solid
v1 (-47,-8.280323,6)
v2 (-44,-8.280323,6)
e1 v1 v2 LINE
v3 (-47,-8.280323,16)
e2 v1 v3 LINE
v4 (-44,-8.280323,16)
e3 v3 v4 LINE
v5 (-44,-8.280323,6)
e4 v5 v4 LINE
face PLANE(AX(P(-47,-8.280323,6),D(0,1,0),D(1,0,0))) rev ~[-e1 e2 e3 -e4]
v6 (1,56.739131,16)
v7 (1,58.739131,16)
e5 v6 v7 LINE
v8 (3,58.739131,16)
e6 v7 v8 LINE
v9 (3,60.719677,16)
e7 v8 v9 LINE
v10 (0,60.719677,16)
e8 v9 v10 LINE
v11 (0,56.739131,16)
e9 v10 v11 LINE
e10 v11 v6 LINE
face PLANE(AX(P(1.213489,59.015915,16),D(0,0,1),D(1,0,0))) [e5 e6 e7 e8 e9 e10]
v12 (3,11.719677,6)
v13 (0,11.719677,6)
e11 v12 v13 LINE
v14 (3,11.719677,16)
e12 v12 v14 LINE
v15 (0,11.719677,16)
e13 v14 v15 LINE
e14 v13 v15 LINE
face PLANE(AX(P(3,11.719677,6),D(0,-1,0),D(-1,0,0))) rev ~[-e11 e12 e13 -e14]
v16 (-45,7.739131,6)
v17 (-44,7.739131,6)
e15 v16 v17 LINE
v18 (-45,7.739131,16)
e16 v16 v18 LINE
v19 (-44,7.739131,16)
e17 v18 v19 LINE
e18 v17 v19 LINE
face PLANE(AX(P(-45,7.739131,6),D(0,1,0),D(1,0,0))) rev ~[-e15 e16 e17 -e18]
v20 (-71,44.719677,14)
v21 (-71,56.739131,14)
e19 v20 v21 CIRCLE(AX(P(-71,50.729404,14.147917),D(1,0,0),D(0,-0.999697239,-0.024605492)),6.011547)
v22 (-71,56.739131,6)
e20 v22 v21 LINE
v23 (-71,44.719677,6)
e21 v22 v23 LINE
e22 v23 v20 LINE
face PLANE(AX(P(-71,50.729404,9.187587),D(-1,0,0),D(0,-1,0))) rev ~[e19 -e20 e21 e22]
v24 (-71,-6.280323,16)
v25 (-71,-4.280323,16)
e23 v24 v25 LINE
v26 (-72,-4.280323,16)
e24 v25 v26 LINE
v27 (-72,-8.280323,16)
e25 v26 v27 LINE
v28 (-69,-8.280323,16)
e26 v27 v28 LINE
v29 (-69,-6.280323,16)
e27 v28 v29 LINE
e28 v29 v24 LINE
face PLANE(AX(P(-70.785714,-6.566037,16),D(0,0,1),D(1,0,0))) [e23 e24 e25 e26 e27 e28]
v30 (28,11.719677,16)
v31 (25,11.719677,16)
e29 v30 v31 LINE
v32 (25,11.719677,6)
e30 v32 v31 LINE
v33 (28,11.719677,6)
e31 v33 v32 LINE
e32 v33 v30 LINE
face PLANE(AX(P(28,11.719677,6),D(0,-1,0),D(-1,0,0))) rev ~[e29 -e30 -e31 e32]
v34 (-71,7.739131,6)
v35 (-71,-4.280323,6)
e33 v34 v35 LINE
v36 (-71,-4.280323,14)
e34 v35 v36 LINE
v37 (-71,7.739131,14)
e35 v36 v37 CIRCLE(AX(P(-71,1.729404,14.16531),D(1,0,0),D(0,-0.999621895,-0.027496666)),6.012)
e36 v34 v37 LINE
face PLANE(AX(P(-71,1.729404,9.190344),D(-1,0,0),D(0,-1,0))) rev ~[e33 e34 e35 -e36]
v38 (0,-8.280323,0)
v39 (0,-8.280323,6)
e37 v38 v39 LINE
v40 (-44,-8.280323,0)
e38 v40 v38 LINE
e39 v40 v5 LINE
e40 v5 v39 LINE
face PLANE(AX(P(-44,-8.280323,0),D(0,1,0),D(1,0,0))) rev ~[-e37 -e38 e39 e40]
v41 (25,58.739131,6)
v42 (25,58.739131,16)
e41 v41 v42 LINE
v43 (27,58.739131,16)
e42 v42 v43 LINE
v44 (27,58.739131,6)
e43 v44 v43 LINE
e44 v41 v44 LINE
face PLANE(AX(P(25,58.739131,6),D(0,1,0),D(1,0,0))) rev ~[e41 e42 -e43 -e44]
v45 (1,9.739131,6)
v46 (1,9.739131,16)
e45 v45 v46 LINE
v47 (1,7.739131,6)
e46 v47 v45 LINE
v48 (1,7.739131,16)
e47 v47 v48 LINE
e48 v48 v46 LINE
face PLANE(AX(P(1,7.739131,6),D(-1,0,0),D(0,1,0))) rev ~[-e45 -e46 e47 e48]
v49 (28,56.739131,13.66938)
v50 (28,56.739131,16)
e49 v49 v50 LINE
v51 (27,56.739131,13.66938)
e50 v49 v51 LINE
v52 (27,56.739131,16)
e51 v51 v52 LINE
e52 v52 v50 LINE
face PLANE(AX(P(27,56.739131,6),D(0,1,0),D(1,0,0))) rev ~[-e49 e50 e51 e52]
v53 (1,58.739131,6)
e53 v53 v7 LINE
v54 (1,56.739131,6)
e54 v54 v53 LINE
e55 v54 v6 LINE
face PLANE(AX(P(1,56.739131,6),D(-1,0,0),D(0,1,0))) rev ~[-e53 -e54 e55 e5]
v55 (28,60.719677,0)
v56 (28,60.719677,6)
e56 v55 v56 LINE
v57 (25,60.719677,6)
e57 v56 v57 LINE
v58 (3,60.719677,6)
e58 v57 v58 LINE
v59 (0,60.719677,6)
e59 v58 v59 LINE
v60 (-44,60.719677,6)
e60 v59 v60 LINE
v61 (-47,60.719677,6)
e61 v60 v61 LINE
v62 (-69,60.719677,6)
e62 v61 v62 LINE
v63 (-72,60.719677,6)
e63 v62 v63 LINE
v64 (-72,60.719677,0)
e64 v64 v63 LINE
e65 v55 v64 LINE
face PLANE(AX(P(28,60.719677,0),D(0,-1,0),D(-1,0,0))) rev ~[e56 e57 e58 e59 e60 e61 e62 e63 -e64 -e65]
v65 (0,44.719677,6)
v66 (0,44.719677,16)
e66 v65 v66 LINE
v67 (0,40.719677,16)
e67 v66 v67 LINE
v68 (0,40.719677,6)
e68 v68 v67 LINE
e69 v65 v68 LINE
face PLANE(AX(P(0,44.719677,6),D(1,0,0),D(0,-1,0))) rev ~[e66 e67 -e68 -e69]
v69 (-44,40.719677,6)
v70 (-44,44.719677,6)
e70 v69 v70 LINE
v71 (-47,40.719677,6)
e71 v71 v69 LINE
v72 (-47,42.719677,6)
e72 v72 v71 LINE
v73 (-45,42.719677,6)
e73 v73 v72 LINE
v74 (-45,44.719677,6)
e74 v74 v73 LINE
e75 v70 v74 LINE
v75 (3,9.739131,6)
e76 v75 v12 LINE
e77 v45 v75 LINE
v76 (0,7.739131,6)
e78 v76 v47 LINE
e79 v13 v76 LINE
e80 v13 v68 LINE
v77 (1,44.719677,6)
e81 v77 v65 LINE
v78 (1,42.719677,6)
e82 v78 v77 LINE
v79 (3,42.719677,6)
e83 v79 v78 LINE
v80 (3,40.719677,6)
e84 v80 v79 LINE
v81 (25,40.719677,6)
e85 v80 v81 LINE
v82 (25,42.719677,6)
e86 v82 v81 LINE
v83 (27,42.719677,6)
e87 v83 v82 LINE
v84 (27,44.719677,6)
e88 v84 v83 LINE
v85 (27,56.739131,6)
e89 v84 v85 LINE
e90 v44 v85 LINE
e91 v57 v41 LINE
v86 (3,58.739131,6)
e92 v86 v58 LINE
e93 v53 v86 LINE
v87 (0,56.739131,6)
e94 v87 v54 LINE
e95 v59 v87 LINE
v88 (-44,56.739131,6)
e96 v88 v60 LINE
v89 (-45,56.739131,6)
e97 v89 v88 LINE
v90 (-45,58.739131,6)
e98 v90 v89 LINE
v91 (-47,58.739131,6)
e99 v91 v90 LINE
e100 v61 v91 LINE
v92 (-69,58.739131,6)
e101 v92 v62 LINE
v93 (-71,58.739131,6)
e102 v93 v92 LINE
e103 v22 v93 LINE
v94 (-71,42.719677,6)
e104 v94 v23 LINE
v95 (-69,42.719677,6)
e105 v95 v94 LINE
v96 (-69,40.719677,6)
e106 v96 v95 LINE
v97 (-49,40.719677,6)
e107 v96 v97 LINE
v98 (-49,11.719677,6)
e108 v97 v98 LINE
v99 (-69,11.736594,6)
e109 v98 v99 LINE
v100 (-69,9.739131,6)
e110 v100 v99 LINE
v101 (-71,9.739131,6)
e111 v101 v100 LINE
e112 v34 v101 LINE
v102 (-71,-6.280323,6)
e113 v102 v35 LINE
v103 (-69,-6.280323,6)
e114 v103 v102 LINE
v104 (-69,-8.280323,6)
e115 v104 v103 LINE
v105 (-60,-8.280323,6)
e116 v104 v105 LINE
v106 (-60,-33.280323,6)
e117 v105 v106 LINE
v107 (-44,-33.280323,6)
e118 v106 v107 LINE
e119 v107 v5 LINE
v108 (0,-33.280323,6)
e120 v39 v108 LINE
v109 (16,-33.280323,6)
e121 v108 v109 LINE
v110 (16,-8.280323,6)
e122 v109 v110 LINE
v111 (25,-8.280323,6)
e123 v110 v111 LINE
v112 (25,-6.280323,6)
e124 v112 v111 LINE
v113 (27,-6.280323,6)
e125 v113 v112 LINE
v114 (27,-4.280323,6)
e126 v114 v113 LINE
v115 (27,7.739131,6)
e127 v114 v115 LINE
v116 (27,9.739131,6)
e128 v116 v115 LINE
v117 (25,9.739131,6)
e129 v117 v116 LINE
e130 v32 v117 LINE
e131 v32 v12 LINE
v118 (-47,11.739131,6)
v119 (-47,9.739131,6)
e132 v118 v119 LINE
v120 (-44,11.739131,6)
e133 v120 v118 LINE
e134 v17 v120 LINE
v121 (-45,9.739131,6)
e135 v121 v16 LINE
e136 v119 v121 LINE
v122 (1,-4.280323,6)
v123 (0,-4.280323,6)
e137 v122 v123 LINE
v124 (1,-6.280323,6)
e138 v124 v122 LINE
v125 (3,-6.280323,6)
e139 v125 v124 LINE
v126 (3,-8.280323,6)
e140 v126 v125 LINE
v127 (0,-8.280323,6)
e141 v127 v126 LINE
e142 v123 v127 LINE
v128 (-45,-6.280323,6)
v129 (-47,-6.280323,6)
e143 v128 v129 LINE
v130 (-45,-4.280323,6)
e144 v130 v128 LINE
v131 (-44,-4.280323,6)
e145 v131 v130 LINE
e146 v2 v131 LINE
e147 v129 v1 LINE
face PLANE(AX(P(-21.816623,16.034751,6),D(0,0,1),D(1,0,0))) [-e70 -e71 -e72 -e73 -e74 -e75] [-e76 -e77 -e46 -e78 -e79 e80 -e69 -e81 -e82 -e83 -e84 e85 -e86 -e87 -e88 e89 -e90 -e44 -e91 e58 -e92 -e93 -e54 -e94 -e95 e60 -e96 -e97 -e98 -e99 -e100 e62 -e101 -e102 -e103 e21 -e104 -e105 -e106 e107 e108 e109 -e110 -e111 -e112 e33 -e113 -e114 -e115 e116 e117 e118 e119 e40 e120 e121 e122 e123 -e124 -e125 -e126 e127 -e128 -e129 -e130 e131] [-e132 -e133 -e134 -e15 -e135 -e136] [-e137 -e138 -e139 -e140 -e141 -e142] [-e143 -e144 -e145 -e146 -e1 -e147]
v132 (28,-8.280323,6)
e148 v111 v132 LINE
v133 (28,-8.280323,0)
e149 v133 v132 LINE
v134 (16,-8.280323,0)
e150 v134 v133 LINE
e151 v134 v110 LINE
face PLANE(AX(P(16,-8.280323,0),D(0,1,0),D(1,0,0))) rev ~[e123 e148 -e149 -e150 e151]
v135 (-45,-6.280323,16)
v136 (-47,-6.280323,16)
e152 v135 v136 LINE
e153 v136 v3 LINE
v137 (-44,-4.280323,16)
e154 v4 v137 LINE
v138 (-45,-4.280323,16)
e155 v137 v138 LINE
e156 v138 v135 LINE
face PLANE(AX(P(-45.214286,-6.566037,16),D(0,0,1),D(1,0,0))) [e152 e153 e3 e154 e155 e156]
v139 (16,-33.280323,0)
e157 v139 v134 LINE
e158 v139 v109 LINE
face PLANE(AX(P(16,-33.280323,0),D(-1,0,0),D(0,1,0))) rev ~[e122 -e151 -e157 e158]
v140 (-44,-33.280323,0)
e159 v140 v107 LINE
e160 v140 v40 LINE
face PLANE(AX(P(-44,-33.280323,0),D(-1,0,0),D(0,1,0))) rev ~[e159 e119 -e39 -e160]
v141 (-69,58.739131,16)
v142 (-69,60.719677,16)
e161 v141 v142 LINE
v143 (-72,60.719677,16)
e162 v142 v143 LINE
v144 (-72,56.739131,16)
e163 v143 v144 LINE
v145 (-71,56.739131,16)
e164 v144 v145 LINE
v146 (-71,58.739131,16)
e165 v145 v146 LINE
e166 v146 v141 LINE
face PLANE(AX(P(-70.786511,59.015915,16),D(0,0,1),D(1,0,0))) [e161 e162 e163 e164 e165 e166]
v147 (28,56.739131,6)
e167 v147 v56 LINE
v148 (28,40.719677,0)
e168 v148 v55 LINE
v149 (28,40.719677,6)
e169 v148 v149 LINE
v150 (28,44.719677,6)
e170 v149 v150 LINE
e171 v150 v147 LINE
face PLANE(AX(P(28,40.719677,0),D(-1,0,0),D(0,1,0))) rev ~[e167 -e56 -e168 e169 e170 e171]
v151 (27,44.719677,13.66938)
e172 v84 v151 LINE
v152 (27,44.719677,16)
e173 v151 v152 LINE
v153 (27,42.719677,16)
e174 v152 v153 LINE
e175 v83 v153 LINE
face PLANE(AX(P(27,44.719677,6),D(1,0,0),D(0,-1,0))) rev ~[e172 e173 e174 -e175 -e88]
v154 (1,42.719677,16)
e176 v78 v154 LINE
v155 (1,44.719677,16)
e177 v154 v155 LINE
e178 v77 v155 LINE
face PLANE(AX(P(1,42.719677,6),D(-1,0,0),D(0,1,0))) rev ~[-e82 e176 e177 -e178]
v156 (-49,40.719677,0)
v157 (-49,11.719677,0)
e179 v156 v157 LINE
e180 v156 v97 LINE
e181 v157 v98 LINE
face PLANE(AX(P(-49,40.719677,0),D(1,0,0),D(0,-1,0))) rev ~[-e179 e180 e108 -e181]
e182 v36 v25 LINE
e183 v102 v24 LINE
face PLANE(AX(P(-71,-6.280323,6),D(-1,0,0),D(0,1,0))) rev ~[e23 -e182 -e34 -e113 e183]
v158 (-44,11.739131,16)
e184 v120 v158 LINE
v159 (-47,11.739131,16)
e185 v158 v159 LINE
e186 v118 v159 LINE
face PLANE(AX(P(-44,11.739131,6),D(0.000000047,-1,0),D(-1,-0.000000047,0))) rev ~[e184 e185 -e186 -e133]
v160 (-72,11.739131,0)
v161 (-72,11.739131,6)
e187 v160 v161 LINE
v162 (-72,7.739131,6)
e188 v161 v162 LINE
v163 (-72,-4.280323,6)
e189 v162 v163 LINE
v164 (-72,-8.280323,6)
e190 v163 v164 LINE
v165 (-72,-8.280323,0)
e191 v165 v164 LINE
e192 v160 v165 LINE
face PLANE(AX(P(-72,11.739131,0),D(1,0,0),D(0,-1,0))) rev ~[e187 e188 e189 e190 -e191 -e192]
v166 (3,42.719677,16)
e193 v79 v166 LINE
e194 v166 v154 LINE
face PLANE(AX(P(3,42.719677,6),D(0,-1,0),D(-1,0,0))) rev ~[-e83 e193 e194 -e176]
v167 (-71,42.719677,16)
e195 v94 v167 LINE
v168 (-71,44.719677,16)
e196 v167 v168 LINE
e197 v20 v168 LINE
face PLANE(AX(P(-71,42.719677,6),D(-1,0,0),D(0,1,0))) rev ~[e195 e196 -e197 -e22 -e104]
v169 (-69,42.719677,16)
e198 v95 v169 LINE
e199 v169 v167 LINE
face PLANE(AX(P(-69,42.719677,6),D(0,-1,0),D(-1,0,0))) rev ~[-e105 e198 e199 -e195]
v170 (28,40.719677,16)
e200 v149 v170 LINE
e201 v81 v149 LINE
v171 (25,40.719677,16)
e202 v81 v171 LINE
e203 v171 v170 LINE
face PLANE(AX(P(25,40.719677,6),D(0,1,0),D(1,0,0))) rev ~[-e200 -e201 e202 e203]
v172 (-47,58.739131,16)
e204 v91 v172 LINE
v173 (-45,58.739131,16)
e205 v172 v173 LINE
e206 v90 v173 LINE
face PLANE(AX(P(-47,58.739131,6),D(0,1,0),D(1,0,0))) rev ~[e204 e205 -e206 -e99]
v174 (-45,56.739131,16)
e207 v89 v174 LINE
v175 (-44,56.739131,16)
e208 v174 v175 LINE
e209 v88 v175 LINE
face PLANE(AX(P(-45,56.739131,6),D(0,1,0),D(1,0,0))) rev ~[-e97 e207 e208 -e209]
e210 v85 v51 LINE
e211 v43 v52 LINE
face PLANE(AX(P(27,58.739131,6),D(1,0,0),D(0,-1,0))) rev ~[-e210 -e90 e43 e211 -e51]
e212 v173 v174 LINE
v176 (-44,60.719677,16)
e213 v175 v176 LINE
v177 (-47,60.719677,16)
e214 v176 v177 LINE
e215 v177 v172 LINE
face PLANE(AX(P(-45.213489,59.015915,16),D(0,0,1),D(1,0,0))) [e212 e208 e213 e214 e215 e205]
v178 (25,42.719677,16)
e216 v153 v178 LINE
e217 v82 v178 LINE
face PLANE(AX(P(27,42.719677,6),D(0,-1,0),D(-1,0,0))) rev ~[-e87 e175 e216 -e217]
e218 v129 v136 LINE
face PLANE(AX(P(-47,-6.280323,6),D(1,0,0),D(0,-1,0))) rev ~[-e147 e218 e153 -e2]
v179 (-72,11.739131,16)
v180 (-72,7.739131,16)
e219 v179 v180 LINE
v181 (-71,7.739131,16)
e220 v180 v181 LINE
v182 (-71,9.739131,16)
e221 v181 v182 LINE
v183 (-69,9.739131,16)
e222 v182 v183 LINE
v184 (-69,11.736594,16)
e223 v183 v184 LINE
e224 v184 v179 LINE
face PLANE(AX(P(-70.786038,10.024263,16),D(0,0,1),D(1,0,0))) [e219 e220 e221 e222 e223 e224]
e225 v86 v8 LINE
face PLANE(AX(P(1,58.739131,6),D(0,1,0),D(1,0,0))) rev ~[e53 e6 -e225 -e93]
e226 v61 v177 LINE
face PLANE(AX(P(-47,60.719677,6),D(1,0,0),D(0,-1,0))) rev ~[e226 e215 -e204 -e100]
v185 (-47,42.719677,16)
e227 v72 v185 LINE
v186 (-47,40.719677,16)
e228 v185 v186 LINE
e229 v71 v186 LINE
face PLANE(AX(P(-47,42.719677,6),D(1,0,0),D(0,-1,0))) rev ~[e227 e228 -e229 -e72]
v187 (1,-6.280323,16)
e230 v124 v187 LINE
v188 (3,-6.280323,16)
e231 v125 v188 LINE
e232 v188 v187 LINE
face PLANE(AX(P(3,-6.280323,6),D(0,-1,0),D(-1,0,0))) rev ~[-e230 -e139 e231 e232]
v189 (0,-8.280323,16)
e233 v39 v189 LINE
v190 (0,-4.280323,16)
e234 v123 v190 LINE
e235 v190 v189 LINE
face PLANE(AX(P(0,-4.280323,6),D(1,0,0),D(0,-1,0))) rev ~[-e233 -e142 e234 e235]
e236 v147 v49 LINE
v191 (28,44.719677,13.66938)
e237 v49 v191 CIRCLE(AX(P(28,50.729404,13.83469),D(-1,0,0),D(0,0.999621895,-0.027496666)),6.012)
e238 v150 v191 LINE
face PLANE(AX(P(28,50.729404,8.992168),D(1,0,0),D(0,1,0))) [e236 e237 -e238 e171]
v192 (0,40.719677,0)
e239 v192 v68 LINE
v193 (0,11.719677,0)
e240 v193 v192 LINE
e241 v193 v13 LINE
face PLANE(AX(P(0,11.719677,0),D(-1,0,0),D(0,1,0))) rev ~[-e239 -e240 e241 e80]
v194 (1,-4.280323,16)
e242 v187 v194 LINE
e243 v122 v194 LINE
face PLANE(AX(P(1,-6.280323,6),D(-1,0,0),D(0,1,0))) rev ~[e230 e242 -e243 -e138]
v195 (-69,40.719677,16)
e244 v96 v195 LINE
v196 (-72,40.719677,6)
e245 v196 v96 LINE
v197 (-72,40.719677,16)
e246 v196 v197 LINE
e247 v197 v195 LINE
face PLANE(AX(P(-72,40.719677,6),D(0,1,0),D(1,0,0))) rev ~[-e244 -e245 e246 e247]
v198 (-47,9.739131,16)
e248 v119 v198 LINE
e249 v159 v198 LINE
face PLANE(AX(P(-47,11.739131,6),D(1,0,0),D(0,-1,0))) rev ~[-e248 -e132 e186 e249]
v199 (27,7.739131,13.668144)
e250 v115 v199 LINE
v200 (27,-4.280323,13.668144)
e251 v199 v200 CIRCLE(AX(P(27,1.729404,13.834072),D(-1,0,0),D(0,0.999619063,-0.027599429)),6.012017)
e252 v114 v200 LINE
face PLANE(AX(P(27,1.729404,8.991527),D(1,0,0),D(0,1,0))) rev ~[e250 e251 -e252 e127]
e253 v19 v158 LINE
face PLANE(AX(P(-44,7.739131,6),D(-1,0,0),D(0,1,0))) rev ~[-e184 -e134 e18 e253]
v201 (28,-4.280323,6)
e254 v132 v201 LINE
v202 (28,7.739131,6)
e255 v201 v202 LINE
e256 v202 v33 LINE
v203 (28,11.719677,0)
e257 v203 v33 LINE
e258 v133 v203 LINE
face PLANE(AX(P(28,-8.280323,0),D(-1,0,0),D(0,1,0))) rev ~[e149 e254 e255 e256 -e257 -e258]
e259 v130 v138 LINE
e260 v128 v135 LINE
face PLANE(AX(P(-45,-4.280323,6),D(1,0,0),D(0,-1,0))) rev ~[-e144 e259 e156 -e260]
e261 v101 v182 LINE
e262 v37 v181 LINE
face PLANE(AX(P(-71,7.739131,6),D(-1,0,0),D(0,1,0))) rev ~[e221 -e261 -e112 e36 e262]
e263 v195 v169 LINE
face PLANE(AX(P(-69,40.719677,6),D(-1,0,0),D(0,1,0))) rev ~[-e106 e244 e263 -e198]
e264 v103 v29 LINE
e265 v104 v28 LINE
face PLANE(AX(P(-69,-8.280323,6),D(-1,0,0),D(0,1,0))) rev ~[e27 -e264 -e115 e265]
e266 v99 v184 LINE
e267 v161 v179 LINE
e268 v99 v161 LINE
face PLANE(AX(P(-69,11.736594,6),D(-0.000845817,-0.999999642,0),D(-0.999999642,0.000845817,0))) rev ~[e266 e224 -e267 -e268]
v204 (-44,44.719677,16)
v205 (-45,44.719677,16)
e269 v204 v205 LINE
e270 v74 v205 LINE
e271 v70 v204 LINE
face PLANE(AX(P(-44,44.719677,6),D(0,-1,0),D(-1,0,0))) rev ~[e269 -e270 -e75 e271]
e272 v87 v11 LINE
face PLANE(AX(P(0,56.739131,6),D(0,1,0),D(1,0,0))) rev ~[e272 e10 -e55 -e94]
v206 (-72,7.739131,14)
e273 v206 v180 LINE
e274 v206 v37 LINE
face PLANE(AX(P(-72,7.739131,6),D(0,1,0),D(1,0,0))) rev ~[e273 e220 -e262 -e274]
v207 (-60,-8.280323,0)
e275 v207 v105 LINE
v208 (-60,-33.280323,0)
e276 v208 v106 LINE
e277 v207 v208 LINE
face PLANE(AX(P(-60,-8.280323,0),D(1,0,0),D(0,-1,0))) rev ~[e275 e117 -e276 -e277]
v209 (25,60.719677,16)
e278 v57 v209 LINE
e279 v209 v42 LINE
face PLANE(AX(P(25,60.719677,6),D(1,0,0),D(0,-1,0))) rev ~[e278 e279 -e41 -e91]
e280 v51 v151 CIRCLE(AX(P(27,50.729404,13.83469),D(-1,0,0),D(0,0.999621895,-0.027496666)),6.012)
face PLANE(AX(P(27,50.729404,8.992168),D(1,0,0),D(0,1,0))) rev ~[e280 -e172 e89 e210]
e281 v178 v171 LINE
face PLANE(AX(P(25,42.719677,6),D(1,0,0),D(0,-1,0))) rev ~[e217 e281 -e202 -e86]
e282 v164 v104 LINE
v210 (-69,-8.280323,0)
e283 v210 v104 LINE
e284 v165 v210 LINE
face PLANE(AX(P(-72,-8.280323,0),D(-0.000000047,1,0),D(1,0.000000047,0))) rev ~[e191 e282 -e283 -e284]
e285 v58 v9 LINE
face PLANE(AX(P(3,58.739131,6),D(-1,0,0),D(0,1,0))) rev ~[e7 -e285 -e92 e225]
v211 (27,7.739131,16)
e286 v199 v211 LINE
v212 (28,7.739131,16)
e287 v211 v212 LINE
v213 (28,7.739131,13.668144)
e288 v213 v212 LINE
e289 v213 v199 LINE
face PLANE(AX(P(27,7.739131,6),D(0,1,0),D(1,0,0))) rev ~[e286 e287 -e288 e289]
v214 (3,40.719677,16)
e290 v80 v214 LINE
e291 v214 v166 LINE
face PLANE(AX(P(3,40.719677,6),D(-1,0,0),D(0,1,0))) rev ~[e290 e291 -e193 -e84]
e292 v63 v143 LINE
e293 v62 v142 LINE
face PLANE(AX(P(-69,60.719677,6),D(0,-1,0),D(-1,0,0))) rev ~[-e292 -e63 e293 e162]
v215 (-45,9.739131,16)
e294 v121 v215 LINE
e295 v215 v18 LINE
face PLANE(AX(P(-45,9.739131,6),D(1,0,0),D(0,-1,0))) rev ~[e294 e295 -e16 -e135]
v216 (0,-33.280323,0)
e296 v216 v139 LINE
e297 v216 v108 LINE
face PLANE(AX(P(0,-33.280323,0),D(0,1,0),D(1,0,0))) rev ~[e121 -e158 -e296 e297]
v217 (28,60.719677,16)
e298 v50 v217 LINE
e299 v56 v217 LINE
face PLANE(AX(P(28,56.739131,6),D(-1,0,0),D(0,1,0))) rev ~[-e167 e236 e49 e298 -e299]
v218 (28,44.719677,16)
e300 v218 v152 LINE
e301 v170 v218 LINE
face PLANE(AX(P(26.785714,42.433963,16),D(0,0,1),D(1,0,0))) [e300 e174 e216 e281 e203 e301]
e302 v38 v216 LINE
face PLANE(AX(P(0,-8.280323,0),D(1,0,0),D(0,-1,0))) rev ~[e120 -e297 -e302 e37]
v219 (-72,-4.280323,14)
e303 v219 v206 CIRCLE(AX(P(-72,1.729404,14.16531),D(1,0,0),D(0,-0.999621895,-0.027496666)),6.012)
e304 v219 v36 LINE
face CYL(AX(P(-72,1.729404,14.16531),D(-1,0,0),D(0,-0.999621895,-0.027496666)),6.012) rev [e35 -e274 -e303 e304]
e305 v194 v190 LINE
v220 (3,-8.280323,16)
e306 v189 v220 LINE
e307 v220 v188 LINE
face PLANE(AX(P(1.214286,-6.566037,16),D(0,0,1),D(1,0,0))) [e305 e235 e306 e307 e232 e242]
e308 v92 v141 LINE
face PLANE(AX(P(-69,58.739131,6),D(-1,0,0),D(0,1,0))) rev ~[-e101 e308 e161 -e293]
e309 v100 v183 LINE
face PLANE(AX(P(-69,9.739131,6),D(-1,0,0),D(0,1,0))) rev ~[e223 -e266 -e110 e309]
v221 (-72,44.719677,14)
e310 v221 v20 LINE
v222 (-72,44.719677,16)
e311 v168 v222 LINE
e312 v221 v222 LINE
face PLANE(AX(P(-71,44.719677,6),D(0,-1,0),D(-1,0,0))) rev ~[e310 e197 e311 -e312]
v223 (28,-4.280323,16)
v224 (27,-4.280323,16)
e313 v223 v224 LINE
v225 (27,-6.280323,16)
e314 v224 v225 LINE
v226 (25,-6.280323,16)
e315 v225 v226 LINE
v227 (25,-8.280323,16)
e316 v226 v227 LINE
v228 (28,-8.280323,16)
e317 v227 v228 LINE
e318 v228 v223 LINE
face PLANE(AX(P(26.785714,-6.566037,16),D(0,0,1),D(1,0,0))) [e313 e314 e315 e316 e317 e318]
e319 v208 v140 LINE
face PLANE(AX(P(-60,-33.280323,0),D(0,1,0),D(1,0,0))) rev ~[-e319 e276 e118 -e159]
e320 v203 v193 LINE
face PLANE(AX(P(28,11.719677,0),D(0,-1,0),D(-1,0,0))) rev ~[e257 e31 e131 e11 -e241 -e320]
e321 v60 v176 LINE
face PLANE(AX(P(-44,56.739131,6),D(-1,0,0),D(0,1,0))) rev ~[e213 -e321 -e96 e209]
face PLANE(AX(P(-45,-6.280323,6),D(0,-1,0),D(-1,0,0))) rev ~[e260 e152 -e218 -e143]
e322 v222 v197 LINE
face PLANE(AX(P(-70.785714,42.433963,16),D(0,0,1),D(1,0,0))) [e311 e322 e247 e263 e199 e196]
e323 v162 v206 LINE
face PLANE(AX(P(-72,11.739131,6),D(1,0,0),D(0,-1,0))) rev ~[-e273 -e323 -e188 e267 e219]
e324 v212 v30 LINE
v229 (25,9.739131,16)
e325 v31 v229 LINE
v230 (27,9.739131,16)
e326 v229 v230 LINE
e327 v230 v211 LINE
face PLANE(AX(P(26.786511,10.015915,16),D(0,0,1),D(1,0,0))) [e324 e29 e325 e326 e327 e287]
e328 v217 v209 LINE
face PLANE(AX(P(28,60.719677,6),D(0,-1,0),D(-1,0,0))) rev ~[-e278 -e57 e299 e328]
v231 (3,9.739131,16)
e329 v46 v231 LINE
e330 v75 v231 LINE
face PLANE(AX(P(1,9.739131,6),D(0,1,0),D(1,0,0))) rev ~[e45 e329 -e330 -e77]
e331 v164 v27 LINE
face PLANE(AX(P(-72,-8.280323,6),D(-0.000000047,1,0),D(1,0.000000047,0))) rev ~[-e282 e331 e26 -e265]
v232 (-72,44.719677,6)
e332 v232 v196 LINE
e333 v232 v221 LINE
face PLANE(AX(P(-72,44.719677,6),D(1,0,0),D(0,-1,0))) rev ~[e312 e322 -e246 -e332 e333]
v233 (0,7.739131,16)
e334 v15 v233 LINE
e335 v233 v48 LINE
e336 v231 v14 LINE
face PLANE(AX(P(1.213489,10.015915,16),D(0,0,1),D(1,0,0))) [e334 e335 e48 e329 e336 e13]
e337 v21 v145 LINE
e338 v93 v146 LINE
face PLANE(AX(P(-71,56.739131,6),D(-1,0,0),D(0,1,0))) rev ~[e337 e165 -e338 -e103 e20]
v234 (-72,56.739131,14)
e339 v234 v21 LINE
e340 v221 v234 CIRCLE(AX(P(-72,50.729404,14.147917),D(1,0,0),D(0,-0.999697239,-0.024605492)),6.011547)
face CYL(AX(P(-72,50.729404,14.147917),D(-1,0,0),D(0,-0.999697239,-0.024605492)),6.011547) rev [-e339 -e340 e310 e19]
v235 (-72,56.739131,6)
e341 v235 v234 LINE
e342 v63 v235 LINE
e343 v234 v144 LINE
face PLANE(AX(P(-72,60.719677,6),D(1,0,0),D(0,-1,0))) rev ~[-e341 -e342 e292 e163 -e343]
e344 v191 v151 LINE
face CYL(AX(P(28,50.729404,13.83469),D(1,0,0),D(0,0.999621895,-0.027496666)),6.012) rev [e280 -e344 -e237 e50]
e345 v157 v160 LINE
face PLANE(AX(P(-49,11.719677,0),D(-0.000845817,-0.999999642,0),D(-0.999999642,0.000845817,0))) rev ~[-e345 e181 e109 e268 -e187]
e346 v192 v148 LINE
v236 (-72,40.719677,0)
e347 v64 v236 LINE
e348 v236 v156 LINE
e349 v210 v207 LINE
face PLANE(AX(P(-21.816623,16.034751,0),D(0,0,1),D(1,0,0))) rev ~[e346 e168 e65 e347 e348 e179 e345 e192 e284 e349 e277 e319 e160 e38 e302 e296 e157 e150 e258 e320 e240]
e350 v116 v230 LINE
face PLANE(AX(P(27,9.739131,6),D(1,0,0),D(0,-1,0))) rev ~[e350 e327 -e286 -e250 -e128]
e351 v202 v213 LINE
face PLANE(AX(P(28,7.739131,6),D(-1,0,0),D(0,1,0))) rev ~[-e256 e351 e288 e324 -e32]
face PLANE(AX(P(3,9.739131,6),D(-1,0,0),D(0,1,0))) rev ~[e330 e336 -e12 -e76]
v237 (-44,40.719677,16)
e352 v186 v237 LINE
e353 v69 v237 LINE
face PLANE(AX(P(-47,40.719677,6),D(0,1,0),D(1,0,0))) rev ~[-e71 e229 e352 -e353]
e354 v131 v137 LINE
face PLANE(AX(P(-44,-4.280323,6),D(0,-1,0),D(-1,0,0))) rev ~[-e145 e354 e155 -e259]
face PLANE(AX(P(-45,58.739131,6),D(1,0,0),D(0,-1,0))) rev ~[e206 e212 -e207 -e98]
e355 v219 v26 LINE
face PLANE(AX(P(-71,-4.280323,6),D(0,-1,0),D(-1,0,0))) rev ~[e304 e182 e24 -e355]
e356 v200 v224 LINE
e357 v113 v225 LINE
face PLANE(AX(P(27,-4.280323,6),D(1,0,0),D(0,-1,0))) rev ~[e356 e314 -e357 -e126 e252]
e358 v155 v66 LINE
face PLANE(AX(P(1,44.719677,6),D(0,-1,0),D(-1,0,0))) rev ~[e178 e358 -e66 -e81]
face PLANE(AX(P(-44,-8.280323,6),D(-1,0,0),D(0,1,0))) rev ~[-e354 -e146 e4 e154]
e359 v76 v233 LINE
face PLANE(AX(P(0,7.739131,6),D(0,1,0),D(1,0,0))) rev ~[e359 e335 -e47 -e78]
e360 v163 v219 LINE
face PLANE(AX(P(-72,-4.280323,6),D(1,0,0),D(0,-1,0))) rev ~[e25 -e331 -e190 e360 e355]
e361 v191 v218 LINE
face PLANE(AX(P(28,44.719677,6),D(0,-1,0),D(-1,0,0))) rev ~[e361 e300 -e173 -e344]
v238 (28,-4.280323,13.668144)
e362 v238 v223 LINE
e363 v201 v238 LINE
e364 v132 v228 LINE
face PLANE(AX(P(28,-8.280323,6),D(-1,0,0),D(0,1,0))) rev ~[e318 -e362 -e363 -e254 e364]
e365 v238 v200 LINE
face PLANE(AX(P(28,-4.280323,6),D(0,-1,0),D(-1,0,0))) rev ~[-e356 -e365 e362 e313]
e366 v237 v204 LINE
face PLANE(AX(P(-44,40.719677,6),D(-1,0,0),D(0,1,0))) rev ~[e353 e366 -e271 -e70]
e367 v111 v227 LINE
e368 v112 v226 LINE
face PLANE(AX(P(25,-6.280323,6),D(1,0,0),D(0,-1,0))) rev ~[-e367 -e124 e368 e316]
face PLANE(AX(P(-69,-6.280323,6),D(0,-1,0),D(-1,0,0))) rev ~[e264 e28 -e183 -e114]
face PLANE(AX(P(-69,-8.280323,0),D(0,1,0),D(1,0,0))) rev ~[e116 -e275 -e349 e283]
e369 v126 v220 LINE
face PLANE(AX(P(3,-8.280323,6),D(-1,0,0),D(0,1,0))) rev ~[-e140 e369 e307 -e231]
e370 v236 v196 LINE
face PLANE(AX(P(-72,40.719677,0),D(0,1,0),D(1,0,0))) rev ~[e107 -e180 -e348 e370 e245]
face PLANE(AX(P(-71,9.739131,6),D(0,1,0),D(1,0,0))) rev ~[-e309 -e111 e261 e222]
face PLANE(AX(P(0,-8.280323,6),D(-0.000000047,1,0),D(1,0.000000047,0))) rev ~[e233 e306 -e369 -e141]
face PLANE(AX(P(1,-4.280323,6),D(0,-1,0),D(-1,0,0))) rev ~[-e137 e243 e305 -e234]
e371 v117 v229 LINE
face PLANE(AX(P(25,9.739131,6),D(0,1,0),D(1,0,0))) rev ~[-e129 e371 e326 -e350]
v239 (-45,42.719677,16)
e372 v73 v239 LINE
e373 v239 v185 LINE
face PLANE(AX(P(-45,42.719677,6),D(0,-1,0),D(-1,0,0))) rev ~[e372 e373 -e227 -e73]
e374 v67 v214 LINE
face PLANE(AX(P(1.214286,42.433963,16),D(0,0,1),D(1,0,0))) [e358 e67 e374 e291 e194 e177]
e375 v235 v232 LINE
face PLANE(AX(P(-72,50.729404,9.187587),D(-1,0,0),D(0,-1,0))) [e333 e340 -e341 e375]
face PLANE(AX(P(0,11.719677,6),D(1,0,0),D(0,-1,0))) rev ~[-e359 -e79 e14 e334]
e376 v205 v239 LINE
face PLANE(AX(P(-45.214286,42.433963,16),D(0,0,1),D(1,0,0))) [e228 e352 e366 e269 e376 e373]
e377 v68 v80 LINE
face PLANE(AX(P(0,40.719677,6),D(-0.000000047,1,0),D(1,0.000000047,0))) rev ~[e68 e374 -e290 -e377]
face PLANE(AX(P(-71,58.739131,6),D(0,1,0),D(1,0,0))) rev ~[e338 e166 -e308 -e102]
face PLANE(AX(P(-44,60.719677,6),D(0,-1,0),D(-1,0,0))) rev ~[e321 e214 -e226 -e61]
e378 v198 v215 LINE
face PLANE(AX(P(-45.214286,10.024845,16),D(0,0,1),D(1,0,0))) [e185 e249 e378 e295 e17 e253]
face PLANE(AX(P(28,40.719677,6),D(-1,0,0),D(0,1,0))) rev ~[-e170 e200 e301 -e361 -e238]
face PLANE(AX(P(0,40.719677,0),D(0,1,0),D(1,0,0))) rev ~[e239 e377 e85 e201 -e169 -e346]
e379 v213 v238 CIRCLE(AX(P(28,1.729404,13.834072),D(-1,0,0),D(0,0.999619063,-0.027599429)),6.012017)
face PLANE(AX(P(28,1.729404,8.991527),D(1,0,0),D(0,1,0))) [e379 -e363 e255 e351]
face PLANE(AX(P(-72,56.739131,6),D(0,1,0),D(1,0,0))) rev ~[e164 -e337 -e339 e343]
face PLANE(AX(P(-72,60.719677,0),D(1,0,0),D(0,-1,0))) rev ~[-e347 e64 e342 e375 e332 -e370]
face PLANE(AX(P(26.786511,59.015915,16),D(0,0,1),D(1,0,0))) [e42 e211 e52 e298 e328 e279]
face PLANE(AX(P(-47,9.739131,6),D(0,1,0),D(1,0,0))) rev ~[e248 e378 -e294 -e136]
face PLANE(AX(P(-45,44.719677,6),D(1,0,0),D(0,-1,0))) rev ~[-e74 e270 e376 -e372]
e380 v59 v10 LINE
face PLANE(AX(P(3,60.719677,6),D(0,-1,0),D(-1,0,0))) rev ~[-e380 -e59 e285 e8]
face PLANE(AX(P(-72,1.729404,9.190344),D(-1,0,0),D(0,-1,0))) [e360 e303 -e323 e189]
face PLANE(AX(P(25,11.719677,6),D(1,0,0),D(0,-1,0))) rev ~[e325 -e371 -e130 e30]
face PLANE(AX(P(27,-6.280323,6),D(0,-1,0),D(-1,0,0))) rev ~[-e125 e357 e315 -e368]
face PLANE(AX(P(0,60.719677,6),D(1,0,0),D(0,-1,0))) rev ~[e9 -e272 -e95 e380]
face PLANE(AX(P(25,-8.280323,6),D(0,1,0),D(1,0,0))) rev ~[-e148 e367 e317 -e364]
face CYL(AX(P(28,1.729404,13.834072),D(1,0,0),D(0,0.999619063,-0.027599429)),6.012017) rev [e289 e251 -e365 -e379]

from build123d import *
from build123d import SkipClean  # not in build123d's __all__

# Parameters (mm, degrees)
F1_DEPTH  = 6
F3_DEPTH  = 10
F5_DEPTH  = 1
F7_DEPTH  = 1
F9_DEPTH  = 1
F10_DEPTH = 1
F13_DEPTH = 1


# Not quite as in the source:
# - ends of sketch curves that miss each other by under 0.0002 mm in the source are joined


with BuildPart() as f1:
    # F0 (on Top) → F1 (new body)
    with BuildSketch(Plane.XY):
        Polygon((-60, -8.2803227458), (-60, -33.2803227458), (-44, -33.2803227458), (-44, -8.2803227458), (0, -8.2803227458), (0, -33.2803227458), (16, -33.2803227458), (16, -8.2803227458), (28, -8.2803227458), (28, 11.7196772542), (0, 11.7196772542), (0, 40.7196772542), (28, 40.7196772542), (28, 60.7196772542), (-72, 60.7196772542), (-72, 40.7196772542), (-49, 40.7196772542), (-49, 11.7196772542), (-72, 11.7391310632), (-72, 11.693589665), (-72, 7.693589665), (-72, -4.280322887), (-72, -8.280322887), (-69, -8.2803227458), align=None)
    extrude(amount=F1_DEPTH)

    # F2 (on face) → F3 (join)
    with BuildSketch(Plane.XY.offset(6)):
        Polygon((-72, 60.7196772542), (-72, 56.7391310632), (-71, 56.7391310632), (-71, 58.7391310632), (-69, 58.7391310632), (-69, 60.7196772542), align=None)
        Polygon((-72, 40.7196773953), (-69, 40.7196773953), (-69, 42.7196773953), (-71, 42.7196773953), (-71, 44.7196773953), (-72, 44.7196773953), align=None)
        Polygon((-45, 42.7196773953), (-47, 42.7196773953), (-47, 40.7196773953), (-44, 40.7196773953), (-44, 44.7196773953), (-45, 44.7196773953), align=None)
        Polygon((-44, 60.7196772542), (-47, 60.7196772542), (-47, 58.7391310632), (-45, 58.7391310632), (-45, 56.7391310632), (-44, 56.7391310632), align=None)
        Polygon((28, 60.7196772542), (25, 60.7196772542), (25, 58.7391310632), (27, 58.7391310632), (27, 56.7391310632), (28, 56.7391310632), align=None)
        Polygon((25, 42.7196773953), (25, 40.7196773953), (28, 40.7196773953), (28, 44.7196773953), (27, 44.7196773953), (27, 42.7196773953), align=None)
        Polygon((0, 44.7196773953), (0, 40.7196772542), (3, 40.7196773953), (3, 42.7196773953), (1, 42.7196773953), (1, 44.7196773953), align=None)
        Polygon((3, 60.7196772542), (0, 60.7196772542), (0, 56.7391310632), (1, 56.7391310632), (1, 58.7391310632), (3, 58.7391310632), align=None)
        Polygon((27, 7.7391309221), (28, 7.7391309221), (28, 11.7196772542), (25, 11.7196772542), (25, 9.7391309221), (27, 9.7391309221), align=None)
        Polygon((25, -6.2803227458), (25, -8.2803227458), (28, -8.2803227458), (28, -4.2803227458), (27, -4.2803227458), (27, -6.2803227458), align=None)
        Polygon((0, -4.2803227458), (0, -8.280322887), (3, -8.2803227458), (3, -6.2803227458), (1, -6.2803227458), (1, -4.2803227458), align=None)
        Polygon((3, 9.7391309221), (3, 11.7196772542), (0, 11.7196772542), (0, 7.7391309221), (1, 7.7391309221), (1, 9.7391309221), align=None)
        Polygon((-45, 7.7391309221), (-44, 7.7391309221), (-44, 11.7391310632), (-47, 11.7391309221), (-47, 9.7391309221), (-45, 9.7391309221), align=None)
        Polygon((-47, -8.2803227458), (-44, -8.2803227458), (-44, -4.2803227458), (-45, -4.2803227458), (-45, -6.2803227458), (-47, -6.2803227458), align=None)
        Polygon((-72, -4.2803227458), (-72, -8.280322887), (-69, -8.2803227458), (-69, -6.2803227458), (-71, -6.2803227458), (-71, -4.2803227458), align=None)
        Polygon((-72, 11.7391310632), (-72, 7.7391309221), (-71, 7.7391309221), (-71, 9.7391309221), (-69, 9.7391309221), (-69, 11.7365936099), align=None)
    with SkipClean():  # cleaning this boolean's faces spoils the solid; the shape is the same uncleaned
        extrude(amount=F3_DEPTH)

    # F4 (on face) → F5 (join)
    with BuildSketch(Plane.YZ.offset(28)):
        with BuildLine():
            ThreePointArc((7.7391309221, 13.6681435205), (1.7294040881, 7.8220547277), (-4.2803227458, 13.6681435205))
            Line((-4.2803227458, 13.6681435205), (-4.2803227458, 6))
            Line((-4.2803227458, 6), (7.7391309221, 6))
            Line((7.7391309221, 6), (7.7391309221, 13.6681435205))
        make_face()
    with SkipClean():  # cleaning this boolean's faces spoils the solid; the shape is the same uncleaned
        extrude(amount=-F5_DEPTH)

    # F6 (on face) → F7 (join)
    with BuildSketch(Plane.YZ.offset(28)):
        with BuildLine():
            ThreePointArc((56.7391310632, 13.6693800888), (50.7294042293, 7.8226900444), (44.7196773953, 13.6693800888))
            Line((44.7196773953, 13.6693800888), (44.7196773953, 6))
            Line((44.7196773953, 6), (56.7391310632, 6))
            Line((56.7391310632, 6), (56.7391310632, 13.6693800888))
        make_face()
    with SkipClean():  # cleaning this boolean's faces spoils the solid; the shape is the same uncleaned
        extrude(amount=-F7_DEPTH)

    # F8 (on face) → F9 (join)
    with BuildSketch(Plane(origin=(-72, 0, 0), x_dir=(0, -1, 0), z_dir=(-1, 0, 0))):
        with BuildLine():
            ThreePointArc((-44.7196773953, 14), (-50.7294042293, 8.1363701718), (-56.7391310632, 14))
            Line((-56.7391310632, 14), (-56.7391310632, 6))
            Line((-56.7391310632, 6), (-44.7196773953, 6))
            Line((-44.7196773953, 6), (-44.7196773953, 14))
        make_face()
    with SkipClean():  # cleaning this boolean's faces spoils the solid; the shape is the same uncleaned
        extrude(amount=-F9_DEPTH)

    # F12 (on face) → F13 (join)
    with BuildSketch(Plane(origin=(-72, 0, 0), x_dir=(0, -1, 0), z_dir=(-1, 0, 0))):
        with BuildLine():
            ThreePointArc((4.2803227458, 14), (-1.7294040881, 8.1533099556), (-7.7391309221, 14))
            Line((-7.7391309221, 14), (-7.7391309221, 6))
            Line((-7.7391309221, 6), (4.2803227458, 6))
            Line((4.2803227458, 6), (4.2803227458, 14))
        make_face()
    with SkipClean():  # cleaning this boolean's faces spoils the solid; the shape is the same uncleaned
        extrude(amount=-F13_DEPTH)


with BuildPart() as f10:
    # F8 (on face) → F10 (new body)
    with BuildSketch(Plane(origin=(-72, 0, 0), x_dir=(0, -1, 0), z_dir=(-1, 0, 0))):
        with BuildLine():
            ThreePointArc((4.282593064, 13.8288382557), (-1.649666924, 7.8232188447), (-7.7391309221, 13.6693800888))
            Line((-7.7391309221, 13.6693800888), (-7.7391309221, 5.9489118867))
            Line((-7.7391309221, 5.9489118867), (4.3871137314, 5.9489118867))
            Line((4.3871137314, 5.9489118867), (4.282593064, 13.8288382557))
        make_face()
    extrude(amount=-F10_DEPTH)


solid = f1.part
